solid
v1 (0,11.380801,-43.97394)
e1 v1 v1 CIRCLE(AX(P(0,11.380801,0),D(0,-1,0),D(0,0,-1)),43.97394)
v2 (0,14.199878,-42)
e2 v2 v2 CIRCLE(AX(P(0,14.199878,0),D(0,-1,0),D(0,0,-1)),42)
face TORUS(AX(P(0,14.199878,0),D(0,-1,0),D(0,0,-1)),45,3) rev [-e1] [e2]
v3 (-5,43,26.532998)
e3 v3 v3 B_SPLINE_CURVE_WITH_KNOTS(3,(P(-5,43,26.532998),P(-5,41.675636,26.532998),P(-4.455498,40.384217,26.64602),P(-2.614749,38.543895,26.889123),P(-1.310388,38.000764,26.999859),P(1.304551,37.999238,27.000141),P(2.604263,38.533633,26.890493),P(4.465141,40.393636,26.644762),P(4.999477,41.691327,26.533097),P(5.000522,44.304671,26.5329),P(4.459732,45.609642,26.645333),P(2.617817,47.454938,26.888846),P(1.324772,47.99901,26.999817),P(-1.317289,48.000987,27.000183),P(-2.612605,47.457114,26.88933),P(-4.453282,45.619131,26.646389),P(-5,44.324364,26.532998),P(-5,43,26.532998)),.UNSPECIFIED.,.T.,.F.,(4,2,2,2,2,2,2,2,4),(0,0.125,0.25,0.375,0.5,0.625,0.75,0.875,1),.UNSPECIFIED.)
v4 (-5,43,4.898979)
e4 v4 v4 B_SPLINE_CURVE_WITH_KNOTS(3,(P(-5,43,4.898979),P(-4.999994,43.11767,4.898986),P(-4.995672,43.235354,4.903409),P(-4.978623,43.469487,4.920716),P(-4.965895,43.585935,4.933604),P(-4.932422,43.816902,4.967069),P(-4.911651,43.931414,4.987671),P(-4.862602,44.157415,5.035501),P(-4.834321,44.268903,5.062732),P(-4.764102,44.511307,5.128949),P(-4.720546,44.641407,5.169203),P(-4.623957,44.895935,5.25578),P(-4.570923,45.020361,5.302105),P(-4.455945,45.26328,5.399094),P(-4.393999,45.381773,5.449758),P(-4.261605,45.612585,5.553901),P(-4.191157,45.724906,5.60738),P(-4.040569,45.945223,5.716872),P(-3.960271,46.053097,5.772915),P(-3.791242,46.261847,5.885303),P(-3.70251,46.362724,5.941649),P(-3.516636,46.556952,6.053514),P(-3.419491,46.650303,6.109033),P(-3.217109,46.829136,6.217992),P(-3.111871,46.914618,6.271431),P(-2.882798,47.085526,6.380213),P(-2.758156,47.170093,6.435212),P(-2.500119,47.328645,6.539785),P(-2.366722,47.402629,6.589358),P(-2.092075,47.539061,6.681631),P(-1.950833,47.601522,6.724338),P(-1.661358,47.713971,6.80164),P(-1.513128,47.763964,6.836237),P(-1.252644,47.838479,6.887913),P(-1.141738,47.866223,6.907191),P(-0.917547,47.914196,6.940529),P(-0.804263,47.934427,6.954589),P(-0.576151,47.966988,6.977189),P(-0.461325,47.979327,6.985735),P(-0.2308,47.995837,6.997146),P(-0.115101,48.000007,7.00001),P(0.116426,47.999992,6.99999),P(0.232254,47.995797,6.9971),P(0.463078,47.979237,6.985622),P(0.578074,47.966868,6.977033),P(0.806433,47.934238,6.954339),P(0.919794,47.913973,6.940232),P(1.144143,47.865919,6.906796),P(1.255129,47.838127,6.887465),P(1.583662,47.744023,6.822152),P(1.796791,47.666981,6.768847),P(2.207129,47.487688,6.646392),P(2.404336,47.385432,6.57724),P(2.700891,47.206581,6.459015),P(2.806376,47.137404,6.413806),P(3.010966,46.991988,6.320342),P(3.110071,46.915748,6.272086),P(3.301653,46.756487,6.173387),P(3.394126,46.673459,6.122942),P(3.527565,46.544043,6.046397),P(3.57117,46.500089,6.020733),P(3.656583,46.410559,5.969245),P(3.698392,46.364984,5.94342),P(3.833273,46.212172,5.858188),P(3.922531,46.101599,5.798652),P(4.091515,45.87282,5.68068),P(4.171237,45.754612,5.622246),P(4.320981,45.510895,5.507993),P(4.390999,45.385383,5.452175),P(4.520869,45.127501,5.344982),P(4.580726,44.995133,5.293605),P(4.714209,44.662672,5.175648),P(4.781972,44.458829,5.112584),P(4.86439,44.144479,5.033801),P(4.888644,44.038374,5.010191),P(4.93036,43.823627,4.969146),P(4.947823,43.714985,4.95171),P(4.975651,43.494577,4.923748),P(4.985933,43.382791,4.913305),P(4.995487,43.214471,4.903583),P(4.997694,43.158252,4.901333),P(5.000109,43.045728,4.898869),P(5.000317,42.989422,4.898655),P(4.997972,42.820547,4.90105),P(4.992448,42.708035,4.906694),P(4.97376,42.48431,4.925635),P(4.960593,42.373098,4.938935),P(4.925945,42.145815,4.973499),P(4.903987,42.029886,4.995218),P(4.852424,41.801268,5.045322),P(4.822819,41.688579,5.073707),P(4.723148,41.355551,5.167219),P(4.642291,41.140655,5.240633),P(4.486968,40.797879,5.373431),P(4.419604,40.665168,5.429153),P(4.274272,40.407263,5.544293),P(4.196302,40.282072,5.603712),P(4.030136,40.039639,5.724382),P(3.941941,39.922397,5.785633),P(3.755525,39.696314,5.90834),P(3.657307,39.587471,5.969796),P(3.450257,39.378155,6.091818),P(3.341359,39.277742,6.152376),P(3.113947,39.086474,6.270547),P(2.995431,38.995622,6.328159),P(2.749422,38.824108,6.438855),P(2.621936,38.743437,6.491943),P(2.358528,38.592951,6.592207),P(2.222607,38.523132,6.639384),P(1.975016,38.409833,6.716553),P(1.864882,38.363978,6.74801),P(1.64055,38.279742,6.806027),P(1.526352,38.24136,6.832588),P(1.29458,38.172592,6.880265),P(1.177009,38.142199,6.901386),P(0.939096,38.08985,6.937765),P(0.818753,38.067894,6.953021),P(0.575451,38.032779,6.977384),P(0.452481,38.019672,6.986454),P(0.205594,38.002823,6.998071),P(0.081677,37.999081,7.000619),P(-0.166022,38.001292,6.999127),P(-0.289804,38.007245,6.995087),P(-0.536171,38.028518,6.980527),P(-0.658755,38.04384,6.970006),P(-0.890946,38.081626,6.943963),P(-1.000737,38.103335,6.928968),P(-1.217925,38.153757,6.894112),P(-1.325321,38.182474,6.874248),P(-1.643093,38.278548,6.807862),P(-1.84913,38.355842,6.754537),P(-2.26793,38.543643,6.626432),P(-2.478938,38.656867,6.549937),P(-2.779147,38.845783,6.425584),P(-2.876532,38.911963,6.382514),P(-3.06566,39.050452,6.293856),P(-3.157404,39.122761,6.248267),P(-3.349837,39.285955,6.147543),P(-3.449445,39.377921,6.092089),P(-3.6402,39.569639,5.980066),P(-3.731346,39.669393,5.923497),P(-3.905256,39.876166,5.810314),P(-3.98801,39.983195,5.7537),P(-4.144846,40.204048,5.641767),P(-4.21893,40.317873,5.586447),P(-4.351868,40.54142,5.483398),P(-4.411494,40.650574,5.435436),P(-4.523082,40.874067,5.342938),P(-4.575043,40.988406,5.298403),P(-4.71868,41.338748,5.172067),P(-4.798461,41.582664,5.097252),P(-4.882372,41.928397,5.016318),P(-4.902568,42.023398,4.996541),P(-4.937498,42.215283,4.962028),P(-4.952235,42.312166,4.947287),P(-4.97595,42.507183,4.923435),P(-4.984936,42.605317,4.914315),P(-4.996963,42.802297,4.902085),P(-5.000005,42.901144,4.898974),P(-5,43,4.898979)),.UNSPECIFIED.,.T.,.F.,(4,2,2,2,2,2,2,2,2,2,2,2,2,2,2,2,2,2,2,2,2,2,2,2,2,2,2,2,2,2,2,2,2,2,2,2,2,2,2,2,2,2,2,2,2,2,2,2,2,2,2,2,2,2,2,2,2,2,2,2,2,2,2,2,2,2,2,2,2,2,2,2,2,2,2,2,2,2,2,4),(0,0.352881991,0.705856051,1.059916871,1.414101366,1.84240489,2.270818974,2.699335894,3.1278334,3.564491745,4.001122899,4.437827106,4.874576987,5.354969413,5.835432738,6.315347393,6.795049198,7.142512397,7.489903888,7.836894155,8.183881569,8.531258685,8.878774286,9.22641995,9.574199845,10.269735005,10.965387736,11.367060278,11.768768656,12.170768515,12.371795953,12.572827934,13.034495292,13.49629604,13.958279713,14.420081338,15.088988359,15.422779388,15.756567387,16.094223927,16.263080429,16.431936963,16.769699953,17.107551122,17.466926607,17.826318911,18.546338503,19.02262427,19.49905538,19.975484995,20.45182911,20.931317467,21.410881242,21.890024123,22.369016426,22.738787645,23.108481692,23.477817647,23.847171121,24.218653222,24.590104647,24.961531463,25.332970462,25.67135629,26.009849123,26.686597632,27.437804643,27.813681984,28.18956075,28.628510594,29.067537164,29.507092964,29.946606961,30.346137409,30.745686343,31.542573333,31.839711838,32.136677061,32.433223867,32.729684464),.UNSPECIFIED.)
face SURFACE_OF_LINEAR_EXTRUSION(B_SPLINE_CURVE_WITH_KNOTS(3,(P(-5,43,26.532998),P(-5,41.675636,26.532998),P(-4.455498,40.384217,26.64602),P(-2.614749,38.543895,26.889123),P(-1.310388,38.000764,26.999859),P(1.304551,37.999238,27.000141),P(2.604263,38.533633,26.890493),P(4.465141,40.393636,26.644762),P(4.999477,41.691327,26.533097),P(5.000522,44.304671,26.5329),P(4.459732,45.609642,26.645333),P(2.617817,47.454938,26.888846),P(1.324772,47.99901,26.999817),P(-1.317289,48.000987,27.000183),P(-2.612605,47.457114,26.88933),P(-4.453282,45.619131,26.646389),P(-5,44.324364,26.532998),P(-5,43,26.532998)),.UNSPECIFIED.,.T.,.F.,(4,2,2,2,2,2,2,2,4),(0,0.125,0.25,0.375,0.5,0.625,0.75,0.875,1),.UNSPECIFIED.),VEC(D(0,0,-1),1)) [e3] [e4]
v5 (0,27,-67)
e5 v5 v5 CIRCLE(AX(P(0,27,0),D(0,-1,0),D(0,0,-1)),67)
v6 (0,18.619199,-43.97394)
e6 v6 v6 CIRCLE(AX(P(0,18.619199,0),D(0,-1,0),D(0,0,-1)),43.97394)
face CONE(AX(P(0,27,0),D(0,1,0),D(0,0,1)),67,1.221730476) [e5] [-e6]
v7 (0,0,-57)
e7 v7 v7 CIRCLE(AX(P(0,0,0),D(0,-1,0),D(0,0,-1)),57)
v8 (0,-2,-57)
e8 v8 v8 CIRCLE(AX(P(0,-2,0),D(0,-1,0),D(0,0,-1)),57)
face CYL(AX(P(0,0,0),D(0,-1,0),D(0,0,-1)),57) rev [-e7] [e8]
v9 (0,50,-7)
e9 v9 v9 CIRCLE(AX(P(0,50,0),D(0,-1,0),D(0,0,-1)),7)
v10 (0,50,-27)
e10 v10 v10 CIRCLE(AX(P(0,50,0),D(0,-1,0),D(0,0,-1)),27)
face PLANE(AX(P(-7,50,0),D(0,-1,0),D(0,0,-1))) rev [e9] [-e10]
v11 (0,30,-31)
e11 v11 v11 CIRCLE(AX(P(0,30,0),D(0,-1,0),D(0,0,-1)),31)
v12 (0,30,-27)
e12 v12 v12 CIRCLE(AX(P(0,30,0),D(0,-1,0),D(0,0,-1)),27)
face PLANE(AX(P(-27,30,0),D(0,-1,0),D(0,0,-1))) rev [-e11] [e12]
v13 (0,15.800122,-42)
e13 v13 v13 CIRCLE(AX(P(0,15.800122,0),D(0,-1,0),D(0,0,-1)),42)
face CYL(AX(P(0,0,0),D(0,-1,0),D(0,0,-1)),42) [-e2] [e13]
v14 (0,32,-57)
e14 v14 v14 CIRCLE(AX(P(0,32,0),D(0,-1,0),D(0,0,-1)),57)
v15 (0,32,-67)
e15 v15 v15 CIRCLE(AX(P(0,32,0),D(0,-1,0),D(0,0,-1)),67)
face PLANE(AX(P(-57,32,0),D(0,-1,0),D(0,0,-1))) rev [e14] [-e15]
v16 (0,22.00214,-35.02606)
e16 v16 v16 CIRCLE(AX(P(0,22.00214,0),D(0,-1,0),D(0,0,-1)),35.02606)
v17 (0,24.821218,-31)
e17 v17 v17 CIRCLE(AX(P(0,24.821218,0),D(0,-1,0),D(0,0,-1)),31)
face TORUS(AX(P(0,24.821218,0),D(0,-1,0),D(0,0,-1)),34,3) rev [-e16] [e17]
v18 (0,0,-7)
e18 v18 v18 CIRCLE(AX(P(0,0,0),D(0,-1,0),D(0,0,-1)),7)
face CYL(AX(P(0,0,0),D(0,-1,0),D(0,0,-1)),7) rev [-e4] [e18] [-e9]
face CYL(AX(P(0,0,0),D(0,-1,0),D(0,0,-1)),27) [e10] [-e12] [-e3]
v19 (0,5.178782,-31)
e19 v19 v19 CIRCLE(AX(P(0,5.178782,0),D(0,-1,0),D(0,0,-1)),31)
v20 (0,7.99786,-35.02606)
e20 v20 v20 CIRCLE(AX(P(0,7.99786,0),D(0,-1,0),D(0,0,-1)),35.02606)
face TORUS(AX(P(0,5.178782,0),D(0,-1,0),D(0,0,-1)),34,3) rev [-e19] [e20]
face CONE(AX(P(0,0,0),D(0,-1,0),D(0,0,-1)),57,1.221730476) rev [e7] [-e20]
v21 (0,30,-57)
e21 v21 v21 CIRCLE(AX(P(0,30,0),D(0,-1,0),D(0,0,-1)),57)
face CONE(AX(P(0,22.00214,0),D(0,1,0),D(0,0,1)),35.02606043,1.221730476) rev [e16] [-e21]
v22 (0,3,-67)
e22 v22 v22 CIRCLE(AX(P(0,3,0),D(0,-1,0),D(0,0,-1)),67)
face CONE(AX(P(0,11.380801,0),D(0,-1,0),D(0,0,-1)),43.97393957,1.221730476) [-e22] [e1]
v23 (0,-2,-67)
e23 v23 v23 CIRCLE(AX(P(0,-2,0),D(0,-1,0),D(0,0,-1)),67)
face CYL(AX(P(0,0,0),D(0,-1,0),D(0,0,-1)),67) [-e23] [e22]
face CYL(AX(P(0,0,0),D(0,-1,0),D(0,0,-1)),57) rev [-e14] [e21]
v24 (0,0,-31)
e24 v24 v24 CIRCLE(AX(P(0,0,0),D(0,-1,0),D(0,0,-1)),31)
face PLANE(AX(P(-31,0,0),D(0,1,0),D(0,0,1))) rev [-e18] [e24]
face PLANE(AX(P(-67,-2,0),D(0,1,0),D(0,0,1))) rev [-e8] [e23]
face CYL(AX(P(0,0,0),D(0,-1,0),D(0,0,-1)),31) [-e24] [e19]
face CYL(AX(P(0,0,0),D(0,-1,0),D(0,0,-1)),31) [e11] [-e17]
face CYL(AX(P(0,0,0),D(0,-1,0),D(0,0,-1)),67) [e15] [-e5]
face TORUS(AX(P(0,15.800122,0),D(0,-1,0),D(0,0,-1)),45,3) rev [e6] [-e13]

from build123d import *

# Parameters (mm, degrees)
CUT_EXTRUDE1_START = 4.898979378
CUT_EXTRUDE1_DEPTH = 22.101020701


# Read off the part's stored shape, not the designer's step: Cut-Extrude1
with BuildPart() as part:
    # Sketch1 → Revolve1 (revolve)
    with BuildSketch(Plane.XY, mode=Mode.PRIVATE) as revolve1_sk:
        with BuildLine():
            Line((-7, 50), (-27, 50))
            Line((-27, 50), (-27, 30))
            Line((-27, 30), (-31, 30))
            Line((-31, 30), (-31, 24.821217929))
            ThreePointArc((-31, 24.821217929), (-32.279270691, 22.363761796), (-35.02606043, 22.002140067))
            Line((-35.02606043, 22.002140067), (-57, 30))
            Line((-57, 30), (-57, 32))
            Line((-57, 32), (-67, 32))
            Line((-67, 32), (-67, 27))
            Line((-67, 27), (-43.97393957, 18.619199391))
            ThreePointArc((-43.97393957, 18.619199391), (-42.542543867, 17.520850838), (-42, 15.800121529))
            Line((-42, 15.800121529), (-42, 14.199878471))
            ThreePointArc((-42, 14.199878471), (-42.542543867, 12.479149162), (-43.97393957, 11.380800609))
            Line((-43.97393957, 11.380800609), (-67, 3))
            Line((-67, 3), (-67, -2))
            Line((-67, -2), (-57, -2))
            Line((-57, -2), (-57, 0))
            Line((-57, 0), (-35.02606043, 7.997859933))
            ThreePointArc((-35.02606043, 7.997859933), (-32.279270691, 7.636238204), (-31, 5.178782071))
            Line((-31, 5.178782071), (-31, 0))
            Line((-31, 0), (-7, 0))
            Line((-7, 0), (-7, 50))
        make_face()
    revolve(revolve1_sk.sketch.rotate(Axis((0, 0, 0), (0, 1, 0)), 270), axis=Axis((0, 0, 0), (0, 1, 0)))

    # Cut-Extrude1 outline → Cut-Extrude1 (cut)
    with BuildSketch(Plane.XY.offset(CUT_EXTRUDE1_START)):
        with BuildLine():
            add(Edge.make_bspline(
                [(-5, 43), (-5, 41.67563617), (-4.455498311, 40.384216944), (-2.614748823, 38.543894661), (-1.310387974, 38.000764057), (1.304550701, 37.999237646), (2.604262767, 38.533632867), (4.465141201, 40.393635869), (4.999476778, 41.691327392), (5.000522421, 44.30467144), (4.459732186, 45.609641922), (2.617817368, 47.4549382), (1.324771948, 47.999010031), (-1.31728863, 48.000987169), (-2.612604689, 47.457113982), (-4.45328192, 45.61913124), (-5, 44.32436383), (-5, 43)],
                knots=[0, 0, 0, 0, 0.125, 0.125, 0.25, 0.25, 0.375, 0.375, 0.5, 0.5, 0.625, 0.625, 0.75, 0.75, 0.875, 0.875, 1, 1, 1, 1], degree=3))
        make_face()
    extrude(amount=CUT_EXTRUDE1_DEPTH, mode=Mode.SUBTRACT)


solid = part.part
